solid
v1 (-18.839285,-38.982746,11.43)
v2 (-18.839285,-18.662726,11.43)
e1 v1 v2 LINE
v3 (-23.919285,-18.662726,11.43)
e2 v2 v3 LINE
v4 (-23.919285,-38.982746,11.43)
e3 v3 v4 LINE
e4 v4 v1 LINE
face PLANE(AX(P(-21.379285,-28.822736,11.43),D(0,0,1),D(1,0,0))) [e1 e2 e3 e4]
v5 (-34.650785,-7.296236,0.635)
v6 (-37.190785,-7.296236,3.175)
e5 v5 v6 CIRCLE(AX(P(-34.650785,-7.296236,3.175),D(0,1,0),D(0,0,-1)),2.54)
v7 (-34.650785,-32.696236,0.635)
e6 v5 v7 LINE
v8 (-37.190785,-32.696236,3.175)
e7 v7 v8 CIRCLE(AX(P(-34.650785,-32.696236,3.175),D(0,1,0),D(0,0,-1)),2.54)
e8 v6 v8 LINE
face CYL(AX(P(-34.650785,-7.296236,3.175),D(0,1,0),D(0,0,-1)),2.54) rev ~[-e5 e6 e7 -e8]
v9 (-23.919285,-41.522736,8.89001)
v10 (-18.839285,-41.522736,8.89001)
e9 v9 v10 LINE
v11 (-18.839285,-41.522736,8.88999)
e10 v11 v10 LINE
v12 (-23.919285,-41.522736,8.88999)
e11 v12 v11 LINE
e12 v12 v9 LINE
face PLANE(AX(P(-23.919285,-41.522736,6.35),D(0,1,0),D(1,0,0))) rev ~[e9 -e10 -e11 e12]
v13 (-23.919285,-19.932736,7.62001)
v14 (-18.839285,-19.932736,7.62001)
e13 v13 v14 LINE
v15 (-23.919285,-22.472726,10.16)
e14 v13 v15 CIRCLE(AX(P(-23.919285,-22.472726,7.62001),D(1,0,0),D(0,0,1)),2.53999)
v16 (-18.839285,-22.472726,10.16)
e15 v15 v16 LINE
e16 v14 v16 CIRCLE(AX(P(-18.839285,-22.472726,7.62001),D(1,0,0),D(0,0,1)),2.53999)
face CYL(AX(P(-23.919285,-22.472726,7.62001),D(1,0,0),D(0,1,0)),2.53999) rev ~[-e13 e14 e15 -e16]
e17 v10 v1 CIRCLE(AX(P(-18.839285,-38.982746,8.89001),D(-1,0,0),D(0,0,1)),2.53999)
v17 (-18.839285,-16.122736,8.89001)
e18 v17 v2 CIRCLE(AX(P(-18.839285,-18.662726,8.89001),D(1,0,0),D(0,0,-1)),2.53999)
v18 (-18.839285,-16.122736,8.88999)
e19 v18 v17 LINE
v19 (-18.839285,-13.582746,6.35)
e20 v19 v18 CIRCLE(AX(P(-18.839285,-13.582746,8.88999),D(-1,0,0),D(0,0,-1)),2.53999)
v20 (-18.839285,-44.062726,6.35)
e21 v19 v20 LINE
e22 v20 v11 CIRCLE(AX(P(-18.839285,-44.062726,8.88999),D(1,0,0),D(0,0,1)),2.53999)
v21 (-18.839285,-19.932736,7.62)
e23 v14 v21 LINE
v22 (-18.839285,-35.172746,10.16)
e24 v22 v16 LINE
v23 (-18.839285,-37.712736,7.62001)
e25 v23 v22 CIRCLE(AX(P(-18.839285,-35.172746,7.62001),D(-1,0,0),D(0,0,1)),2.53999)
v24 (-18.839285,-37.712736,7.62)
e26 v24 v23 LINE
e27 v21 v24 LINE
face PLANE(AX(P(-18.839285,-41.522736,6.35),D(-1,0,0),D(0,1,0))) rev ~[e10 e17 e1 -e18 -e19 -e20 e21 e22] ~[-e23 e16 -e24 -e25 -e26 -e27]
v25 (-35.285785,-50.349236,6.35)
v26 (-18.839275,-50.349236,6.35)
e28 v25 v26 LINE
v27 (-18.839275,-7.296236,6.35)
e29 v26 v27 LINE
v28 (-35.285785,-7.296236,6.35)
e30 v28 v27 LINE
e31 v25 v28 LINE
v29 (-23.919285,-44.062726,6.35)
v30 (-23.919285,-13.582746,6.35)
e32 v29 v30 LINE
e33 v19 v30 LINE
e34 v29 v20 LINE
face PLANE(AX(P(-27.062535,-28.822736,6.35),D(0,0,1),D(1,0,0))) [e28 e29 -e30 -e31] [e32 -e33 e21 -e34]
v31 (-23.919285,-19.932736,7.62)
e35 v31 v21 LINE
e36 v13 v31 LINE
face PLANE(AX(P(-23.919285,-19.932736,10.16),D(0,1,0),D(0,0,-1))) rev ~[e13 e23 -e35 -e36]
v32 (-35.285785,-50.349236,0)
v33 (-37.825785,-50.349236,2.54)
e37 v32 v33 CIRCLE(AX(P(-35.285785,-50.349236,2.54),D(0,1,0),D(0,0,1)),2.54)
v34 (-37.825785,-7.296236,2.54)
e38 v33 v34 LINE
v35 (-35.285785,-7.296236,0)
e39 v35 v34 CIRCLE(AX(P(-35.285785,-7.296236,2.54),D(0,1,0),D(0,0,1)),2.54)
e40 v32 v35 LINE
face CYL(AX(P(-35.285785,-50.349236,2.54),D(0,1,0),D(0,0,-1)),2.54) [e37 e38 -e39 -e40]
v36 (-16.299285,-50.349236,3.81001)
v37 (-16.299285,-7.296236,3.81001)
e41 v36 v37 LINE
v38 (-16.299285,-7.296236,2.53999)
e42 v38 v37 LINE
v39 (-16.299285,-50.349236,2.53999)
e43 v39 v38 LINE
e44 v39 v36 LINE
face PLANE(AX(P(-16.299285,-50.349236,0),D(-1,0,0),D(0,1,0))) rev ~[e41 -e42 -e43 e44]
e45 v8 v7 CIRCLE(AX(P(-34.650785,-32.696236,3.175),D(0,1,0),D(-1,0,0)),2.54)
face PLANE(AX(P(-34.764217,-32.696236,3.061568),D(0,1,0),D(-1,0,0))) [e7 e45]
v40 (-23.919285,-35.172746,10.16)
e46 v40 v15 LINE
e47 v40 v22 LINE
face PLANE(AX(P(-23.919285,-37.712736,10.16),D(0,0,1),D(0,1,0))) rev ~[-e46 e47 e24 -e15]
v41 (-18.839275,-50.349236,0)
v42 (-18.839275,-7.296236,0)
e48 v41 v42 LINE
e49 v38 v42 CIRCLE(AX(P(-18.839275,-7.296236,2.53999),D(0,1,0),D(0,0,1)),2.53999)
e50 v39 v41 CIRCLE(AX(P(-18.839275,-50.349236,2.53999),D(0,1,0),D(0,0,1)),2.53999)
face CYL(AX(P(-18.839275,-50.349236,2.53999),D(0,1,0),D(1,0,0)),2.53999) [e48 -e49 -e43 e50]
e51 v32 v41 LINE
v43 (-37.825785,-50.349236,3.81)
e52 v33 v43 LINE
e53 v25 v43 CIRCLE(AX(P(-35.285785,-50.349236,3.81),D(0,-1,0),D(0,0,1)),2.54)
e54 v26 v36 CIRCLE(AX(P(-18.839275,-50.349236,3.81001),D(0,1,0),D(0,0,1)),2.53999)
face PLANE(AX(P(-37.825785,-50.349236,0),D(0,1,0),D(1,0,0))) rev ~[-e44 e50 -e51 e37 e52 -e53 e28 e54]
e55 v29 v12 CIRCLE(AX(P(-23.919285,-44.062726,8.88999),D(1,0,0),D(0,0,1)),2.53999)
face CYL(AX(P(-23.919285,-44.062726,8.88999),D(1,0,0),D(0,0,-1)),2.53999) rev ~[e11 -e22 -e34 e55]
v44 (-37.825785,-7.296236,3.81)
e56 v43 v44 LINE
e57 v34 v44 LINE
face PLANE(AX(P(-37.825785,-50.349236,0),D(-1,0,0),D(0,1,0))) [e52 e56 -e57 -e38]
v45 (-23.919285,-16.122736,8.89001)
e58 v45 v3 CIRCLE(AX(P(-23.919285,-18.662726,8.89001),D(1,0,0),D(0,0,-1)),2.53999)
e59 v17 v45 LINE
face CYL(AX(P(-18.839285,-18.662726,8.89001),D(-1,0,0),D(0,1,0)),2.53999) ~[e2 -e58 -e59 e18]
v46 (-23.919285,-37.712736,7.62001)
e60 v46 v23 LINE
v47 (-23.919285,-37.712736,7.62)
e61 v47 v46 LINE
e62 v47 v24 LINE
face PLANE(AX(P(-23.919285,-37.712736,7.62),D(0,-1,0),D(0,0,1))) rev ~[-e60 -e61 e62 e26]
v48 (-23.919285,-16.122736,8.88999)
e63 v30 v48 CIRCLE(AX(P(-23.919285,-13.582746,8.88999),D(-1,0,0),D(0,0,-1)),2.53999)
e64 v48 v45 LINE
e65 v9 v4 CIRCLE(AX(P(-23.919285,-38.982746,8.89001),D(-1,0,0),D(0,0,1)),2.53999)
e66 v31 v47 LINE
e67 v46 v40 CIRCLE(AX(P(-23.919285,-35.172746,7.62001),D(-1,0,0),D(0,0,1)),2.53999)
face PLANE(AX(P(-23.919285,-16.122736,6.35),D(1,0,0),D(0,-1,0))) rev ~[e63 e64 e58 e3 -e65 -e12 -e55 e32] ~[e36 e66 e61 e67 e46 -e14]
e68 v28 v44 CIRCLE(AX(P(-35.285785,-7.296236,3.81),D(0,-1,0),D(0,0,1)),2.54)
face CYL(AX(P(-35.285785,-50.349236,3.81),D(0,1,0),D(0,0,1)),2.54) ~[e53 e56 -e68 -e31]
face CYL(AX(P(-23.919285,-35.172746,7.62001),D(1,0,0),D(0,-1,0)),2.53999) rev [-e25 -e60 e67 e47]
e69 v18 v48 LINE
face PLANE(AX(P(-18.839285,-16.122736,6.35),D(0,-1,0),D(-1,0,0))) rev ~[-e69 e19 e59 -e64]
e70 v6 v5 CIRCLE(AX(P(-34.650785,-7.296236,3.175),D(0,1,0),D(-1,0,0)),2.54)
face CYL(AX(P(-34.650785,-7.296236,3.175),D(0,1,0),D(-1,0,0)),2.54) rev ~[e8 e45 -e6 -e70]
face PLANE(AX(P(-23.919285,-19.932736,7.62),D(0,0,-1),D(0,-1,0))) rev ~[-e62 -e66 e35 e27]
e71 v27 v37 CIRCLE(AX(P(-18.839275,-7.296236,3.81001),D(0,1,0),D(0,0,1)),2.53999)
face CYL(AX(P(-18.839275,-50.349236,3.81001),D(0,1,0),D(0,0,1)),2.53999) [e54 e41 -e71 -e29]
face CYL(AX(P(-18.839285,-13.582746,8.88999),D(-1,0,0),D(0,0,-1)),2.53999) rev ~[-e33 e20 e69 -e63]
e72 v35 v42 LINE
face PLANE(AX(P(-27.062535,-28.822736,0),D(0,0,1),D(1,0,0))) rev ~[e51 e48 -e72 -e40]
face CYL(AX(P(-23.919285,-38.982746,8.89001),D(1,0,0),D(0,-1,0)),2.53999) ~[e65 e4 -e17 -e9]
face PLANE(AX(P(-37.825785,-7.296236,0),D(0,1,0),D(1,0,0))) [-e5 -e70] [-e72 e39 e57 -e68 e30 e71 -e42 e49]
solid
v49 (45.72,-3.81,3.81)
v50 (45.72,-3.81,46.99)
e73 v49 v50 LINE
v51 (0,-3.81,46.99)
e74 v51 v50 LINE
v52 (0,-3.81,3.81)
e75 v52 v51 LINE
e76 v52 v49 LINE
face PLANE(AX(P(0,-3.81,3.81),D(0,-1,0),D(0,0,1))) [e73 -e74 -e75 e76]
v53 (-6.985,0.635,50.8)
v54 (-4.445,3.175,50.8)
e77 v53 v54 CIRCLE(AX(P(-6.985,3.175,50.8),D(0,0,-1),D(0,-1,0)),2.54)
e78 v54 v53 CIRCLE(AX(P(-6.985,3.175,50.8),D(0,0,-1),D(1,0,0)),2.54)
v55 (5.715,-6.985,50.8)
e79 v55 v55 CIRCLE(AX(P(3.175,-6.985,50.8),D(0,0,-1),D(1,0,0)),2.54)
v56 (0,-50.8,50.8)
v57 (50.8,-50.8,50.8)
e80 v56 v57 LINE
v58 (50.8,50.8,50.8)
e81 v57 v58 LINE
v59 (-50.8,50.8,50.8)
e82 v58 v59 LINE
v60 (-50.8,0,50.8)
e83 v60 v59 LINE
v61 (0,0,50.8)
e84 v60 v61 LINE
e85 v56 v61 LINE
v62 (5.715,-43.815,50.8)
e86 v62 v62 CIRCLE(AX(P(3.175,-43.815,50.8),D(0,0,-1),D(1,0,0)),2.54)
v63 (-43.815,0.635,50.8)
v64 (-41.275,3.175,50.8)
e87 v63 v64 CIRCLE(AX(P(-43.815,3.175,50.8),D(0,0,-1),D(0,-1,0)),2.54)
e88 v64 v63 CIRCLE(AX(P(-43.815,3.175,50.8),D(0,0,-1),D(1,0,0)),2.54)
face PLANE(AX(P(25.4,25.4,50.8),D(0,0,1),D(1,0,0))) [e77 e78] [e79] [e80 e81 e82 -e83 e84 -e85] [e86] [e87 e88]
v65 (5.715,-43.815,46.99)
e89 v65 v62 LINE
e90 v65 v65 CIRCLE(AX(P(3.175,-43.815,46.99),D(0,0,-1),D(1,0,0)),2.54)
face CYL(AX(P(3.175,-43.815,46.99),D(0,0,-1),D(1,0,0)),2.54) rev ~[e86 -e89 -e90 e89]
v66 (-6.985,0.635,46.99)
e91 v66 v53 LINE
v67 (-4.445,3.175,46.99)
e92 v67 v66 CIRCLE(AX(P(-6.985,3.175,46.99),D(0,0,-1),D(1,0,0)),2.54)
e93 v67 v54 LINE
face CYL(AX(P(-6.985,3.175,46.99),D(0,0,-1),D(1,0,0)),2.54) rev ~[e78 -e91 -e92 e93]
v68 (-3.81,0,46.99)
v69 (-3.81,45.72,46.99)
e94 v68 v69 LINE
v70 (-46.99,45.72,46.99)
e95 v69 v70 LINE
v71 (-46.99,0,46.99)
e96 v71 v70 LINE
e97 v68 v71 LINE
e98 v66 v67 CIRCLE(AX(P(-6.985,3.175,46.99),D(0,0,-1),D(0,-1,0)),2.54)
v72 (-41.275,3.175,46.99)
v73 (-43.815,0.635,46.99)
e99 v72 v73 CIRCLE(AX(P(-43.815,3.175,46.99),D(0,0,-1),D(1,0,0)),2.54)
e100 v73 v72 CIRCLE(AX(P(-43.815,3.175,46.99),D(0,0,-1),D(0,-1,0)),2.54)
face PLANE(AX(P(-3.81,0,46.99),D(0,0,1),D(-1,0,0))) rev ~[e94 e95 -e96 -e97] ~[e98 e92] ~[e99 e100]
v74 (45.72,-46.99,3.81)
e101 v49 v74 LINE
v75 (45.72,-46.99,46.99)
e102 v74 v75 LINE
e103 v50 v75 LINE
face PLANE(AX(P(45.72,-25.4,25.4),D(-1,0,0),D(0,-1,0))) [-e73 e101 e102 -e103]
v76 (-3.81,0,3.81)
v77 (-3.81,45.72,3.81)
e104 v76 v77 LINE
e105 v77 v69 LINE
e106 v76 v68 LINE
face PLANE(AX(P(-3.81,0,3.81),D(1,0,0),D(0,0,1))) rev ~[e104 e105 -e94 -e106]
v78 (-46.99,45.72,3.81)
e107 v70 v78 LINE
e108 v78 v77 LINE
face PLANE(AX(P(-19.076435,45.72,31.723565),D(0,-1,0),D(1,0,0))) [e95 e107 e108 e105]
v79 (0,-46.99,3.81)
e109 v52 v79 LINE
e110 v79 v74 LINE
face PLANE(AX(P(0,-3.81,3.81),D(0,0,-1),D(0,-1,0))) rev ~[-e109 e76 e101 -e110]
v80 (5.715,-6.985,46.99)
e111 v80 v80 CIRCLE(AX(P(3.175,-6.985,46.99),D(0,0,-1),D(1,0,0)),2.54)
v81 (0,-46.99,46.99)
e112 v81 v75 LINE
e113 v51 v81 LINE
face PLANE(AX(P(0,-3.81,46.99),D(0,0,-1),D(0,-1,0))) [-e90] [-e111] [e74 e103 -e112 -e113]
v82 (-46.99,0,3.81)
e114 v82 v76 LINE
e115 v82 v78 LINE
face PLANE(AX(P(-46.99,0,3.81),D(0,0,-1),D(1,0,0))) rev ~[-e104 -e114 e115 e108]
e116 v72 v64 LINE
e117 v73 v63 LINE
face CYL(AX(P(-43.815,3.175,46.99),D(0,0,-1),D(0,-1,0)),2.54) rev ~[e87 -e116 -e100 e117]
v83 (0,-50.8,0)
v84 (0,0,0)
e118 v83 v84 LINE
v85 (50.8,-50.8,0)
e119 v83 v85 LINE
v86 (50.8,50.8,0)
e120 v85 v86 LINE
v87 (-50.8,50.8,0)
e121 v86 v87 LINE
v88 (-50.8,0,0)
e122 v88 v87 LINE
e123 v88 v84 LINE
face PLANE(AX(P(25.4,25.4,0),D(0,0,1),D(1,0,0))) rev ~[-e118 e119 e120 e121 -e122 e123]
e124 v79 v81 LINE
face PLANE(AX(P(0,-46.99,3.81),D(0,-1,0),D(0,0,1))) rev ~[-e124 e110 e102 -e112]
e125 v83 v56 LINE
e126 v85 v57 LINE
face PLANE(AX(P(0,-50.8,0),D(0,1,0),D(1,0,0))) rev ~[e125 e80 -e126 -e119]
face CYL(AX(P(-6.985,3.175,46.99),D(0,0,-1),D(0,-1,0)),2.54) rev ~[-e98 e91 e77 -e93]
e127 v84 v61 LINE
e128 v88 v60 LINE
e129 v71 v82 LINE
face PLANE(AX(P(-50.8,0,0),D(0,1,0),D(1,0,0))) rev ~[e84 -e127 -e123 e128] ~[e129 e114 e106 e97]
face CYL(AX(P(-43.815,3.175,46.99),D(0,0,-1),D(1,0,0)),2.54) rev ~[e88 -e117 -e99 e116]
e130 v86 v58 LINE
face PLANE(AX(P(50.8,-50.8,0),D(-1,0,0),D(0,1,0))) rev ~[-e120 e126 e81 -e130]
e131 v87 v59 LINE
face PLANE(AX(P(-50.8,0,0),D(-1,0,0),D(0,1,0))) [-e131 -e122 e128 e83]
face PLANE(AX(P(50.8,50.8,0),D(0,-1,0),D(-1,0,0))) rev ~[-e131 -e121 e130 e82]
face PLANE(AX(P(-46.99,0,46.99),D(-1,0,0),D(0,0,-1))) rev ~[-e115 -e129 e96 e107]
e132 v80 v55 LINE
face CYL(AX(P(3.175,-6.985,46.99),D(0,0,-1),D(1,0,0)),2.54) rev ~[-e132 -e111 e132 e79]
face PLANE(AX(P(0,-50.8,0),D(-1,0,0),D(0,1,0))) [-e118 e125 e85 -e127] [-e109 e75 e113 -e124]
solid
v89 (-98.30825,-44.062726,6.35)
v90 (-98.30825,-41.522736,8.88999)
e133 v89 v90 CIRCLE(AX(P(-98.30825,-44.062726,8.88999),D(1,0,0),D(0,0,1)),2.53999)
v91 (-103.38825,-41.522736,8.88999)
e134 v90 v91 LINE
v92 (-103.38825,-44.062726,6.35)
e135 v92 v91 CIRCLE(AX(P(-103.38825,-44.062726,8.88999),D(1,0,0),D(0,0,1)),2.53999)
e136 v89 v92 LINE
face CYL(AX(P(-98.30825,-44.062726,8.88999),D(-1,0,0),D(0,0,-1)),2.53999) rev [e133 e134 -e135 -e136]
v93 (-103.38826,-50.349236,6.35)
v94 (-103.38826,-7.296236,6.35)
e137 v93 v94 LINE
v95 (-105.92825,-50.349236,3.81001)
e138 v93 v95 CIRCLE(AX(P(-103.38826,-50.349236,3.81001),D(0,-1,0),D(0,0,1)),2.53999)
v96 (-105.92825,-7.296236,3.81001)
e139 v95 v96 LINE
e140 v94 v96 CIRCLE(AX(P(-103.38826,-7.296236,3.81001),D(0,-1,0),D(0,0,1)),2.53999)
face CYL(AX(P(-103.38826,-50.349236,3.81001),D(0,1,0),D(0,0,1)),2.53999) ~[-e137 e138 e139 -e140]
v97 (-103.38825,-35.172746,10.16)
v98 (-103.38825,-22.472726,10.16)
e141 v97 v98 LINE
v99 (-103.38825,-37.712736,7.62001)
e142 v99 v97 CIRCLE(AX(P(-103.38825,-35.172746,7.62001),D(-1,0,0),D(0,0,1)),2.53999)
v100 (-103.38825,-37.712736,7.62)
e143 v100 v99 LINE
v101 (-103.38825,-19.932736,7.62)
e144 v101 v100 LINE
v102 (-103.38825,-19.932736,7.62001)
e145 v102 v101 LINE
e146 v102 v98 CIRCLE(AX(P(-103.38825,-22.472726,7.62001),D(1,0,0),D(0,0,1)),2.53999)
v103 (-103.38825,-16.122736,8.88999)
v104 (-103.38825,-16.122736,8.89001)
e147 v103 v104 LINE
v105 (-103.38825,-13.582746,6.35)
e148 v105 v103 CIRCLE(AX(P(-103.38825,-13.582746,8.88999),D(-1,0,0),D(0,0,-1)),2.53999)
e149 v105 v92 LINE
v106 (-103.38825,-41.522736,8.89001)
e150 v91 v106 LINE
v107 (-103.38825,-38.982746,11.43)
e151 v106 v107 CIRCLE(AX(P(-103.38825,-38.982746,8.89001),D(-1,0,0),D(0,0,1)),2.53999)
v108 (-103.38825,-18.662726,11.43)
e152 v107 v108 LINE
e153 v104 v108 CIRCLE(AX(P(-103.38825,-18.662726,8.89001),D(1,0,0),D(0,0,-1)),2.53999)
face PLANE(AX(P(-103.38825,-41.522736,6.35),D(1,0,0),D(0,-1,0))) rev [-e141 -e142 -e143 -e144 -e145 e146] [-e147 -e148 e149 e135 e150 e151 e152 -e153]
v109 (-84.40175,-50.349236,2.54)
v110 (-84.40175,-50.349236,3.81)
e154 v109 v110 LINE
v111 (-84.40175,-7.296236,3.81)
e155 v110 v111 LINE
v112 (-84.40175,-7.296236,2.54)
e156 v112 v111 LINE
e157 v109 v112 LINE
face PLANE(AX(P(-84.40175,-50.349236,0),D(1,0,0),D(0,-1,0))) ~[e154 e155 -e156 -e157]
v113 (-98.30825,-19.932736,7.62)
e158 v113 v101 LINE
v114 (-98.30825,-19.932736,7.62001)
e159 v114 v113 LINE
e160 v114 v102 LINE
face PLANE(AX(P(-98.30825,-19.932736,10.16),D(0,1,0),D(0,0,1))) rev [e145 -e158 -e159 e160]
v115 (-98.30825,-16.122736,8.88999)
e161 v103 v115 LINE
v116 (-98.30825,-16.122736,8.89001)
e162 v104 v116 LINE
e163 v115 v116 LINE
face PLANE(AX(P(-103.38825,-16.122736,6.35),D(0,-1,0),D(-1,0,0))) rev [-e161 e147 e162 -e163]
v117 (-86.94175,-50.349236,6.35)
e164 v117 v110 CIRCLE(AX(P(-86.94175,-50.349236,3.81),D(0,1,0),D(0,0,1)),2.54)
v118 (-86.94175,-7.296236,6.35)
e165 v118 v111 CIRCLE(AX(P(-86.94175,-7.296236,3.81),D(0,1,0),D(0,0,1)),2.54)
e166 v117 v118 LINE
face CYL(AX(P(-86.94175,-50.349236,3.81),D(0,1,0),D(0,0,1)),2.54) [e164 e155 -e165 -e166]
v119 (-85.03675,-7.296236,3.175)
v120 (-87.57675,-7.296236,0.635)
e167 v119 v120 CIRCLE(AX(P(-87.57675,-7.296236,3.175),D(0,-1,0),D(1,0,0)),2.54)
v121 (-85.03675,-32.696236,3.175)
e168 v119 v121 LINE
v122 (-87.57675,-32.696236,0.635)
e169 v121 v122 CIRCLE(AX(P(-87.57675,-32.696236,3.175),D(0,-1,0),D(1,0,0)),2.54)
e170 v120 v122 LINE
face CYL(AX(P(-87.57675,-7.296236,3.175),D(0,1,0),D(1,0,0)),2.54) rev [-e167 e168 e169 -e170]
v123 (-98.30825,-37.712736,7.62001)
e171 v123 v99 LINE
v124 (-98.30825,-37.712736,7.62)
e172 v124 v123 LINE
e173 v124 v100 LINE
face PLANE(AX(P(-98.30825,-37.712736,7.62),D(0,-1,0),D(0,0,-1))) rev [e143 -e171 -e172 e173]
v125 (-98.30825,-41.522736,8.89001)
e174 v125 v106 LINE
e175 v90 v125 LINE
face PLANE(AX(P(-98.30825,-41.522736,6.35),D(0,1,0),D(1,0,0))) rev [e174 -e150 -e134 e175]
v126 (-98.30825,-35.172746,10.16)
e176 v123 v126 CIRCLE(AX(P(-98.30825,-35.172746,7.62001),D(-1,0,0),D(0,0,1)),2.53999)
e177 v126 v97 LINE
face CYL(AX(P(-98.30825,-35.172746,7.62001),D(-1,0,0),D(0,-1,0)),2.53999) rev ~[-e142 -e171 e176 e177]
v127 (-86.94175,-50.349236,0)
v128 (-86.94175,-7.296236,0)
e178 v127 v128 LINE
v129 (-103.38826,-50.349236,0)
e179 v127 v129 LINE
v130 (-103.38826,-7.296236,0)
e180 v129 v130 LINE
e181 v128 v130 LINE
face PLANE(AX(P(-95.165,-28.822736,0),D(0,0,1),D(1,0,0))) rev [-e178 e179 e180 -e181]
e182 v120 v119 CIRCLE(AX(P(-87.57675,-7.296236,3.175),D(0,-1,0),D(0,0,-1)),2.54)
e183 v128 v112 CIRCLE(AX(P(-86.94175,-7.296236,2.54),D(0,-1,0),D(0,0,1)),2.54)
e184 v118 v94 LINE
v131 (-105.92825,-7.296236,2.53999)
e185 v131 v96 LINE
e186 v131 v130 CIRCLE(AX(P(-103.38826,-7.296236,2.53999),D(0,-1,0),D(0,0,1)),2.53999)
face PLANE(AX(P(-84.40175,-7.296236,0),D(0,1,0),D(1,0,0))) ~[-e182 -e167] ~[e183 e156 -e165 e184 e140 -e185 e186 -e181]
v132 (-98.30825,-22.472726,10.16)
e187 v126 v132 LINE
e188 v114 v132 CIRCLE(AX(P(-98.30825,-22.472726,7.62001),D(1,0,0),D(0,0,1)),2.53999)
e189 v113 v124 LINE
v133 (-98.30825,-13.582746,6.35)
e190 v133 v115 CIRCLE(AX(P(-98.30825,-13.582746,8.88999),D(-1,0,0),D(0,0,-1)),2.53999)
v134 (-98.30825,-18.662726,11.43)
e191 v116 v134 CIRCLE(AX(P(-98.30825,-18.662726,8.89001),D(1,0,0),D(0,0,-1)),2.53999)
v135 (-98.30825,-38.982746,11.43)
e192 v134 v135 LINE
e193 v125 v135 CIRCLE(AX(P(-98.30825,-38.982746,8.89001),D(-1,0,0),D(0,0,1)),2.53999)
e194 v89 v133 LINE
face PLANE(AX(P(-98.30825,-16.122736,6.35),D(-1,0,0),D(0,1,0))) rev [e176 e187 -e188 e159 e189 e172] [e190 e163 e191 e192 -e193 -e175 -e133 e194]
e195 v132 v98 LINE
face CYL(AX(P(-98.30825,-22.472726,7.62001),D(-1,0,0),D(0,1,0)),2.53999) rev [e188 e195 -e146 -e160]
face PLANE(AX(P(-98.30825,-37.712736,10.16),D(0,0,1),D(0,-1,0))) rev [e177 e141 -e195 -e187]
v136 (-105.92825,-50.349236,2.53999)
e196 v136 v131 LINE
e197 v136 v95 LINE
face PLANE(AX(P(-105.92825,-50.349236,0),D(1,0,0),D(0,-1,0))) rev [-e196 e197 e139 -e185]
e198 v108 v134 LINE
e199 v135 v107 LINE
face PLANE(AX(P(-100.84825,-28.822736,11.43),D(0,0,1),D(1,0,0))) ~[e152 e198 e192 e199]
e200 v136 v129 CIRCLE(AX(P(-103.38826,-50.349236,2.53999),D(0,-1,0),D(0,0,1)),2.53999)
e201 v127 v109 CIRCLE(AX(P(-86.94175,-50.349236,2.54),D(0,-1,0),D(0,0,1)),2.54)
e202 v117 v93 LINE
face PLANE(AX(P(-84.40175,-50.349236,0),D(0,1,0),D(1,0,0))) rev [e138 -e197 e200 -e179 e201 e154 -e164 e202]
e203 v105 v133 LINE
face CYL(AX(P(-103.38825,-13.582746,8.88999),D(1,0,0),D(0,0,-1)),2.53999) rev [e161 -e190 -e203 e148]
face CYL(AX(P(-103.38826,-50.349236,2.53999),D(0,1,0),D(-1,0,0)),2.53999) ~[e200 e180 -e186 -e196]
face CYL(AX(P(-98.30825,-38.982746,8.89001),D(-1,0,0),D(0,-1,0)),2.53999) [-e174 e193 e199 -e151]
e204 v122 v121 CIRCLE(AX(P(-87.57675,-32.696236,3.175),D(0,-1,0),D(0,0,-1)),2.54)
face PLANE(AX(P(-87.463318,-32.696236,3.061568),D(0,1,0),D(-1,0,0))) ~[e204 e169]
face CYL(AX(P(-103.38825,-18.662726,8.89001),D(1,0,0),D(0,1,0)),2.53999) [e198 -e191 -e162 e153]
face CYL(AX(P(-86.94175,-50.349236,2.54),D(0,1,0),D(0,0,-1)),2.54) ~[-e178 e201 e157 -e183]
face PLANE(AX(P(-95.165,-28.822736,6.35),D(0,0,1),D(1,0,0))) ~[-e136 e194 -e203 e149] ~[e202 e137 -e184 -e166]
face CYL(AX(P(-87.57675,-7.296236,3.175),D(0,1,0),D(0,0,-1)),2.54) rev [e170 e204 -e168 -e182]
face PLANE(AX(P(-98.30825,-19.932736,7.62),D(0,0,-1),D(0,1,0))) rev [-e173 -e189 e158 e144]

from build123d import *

# Parameters (mm, degrees)
F0_W      = 50.8
F0_H      = 50.8
F1_DEPTH  = 50.8
F4_DEPTH  = 45.72
F6_DEPTH  = 25.4
F2_W      = 43.18
F2_H      = 43.18
F7_DEPTH  = 45.72
F8_R      = 2.54
F9_DEPTH  = 25.4
F10_W     = 21.5265
F10_H     = 43.053
F11_DEPTH = 6.35
F13_DEPTH = 25.4
F15_DEPTH = 5.08
F17_DEPTH = 25.4
F18_R     = 2.53999
F19_W     = 5.3519308567
F19_H     = 34.44376681
F20_DEPTH = 25.4
F22_DEPTH = 25.4
F23_R     = 2.54
F23_2_R   = 2.54
F24_R     = 2.53999
F24_2_R   = 2.53999


# Not quite as in the source:
# - a fillet or chamfer is up to 0.001 mm smaller than in the source, because OpenCascade refuses the exact size


with BuildPart() as f1:
    # F0 (on Top) → F1 (new body)
    with BuildSketch(Plane.XY):
        with Locations((25.4, 25.4)):
            Rectangle(F0_W, F0_H)
        with Locations((-25.4, 25.4)):
            Rectangle(F0_W, F0_H)
        with Locations((25.4, -25.4)):
            Rectangle(F0_W, F0_H)
    extrude(amount=F1_DEPTH)

    # F3 (on face) → F4 (cut)
    with BuildSketch(Plane.XZ):
        Polygon((-3.81, 46.99), (-46.99, 46.99), (-3.81, 3.81), align=None)
        Polygon((-3.81, 3.81), (-46.99, 46.99), (-46.99, 3.81), align=None)
    extrude(amount=-F4_DEPTH, mode=Mode.SUBTRACT)

    # F5 (on face) → F6 (cut)
    with BuildSketch(Plane(origin=(0, 0, 46.99), x_dir=(1, 0, 0), z_dir=(0, 0, -1))):
        with BuildLine():
            ThreePointArc((-41.275, -3.175), (-42.0189487758, -1.3789487758), (-43.815, -0.635))
            ThreePointArc((-43.815, -0.635), (-45.6110512242, -4.9710512242), (-41.275, -3.175))
        make_face()
        with BuildLine():
            ThreePointArc((-4.445, -3.175), (-5.1889487758, -1.3789487758), (-6.985, -0.635))
            ThreePointArc((-6.985, -0.635), (-8.7810512242, -4.9710512242), (-4.445, -3.175))
        make_face()
    extrude(amount=-F6_DEPTH, mode=Mode.SUBTRACT)

    # F2 (on face) → F7 (cut)
    with BuildSketch(Plane(origin=(0, 0, 0), x_dir=(0, -1, 0), z_dir=(-1, 0, 0))):
        with Locations((25.4, 25.4)):
            Rectangle(F2_W, F2_H)
    extrude(amount=-F7_DEPTH, mode=Mode.SUBTRACT)

    # F8 (on face) → F9 (cut)
    with BuildSketch(Plane(origin=(0, 0, 46.99), x_dir=(1, 0, 0), z_dir=(0, 0, -1))):
        with BuildLine():
            ThreePointArc((0.635, 6.985), (3.175, 4.445), (5.715, 6.985))
            ThreePointArc((5.715, 6.985), (3.175, 9.525), (0.635, 6.985))
        make_face()
        with Locations((3.175, 43.815)):
            Circle(F8_R)
    extrude(amount=-F9_DEPTH, mode=Mode.SUBTRACT)


with BuildPart() as f11:
    # F10 (on Top) → F11 (new body)
    with BuildSketch(Plane.XY):
        with Locations((-27.0625350275, -28.8227358833)):
            Rectangle(F10_W, F10_H)
    extrude(amount=F11_DEPTH)

    # F12 (on face) → F13 (cut)
    with BuildSketch(Plane(origin=(0, -7.2962358833, 0), x_dir=(-1, 0, 0), z_dir=(0, 1, 0))):
        with BuildLine():
            ThreePointArc((34.6507850275, 0.635), (36.4468362517, 1.3789487758), (37.1907850275, 3.175))
            ThreePointArc((37.1907850275, 3.175), (32.8547338033, 4.9710512242), (34.6507850275, 0.635))
        make_face()
    extrude(amount=-F13_DEPTH, mode=Mode.SUBTRACT)

    # F14 (on face) → F15 (join)
    with BuildSketch(Plane.XY.offset(6.35)):
        Polygon((-18.8392850275, -28.8227358833), (-18.8392850275, -16.1227358833), (-23.9192850275, -16.1227358833), (-23.9192850275, -41.5227358833), (-18.8392850275, -41.5227358833), align=None)
    extrude(amount=F15_DEPTH)

    # F16 (on face) → F17 (cut)
    with BuildSketch(Plane(origin=(-23.9192850275, 0, 0), x_dir=(0, -1, 0), z_dir=(-1, 0, 0))):
        Polygon((37.7127358833, 10.16), (22.4727358833, 10.16), (35.1727358833, 7.62), (37.7127358833, 7.62), align=None)
        Polygon((35.1727358833, 7.62), (22.4727358833, 10.16), (19.9327358833, 10.16), (19.9327358833, 7.62), align=None)
    extrude(amount=-F17_DEPTH, mode=Mode.SUBTRACT)

    # F18 (radius 2.54 in the source; OpenCascade refuses exactly that, so slightly less here)
    f18_edges = [f11.edges().sort_by_distance(p)[0] for p in [
        (-21.379285, -41.522736, 6.35),
        (-21.379285, -41.522736, 11.43),
        (-21.379285, -16.122736, 11.43),
        (-21.379285, -16.122736, 6.35),
        (-21.379285, -19.932736, 10.16),
        (-21.379285, -37.712736, 10.16),
    ]]
    fillet(f18_edges, radius=F18_R)


with BuildPart() as f20:
    # F19 (on Top) → F20 (new body)
    with BuildSketch(Plane.XY):
        with Locations((-63.7897327542, -23.4408969991)):
            Rectangle(F19_W, F19_H)
    extrude(amount=F20_DEPTH)

    # F22 (cut): a face of the model
    f22_faces = [f20.faces().sort_by_distance(p)[0] for p in [
        (-63.7897327542, -23.4408969991, 25.4),
    ]]
    extrude(f22_faces, amount=-F22_DEPTH, mode=Mode.SUBTRACT)


with BuildPart() as f21_1:
    # F21: instance of F11
    add(f11.part.mirror(Plane(origin=(-61.1137673259, -23.4408969991, 12.7), x_dir=(0, 1, 0), z_dir=(1, 0, 0))))

    # F23
    f23_edges = [f21_1.edges().sort_by_distance(p)[0] for p in [
        (-84.40175, -28.822736, 6.35),
        (-84.40175, -28.822736, 0),
    ]]
    fillet(f23_edges, radius=F23_R)

    # F24#2 (radius 2.54 in the source; OpenCascade refuses exactly that, so slightly less here)
    f24_2_edges = [f21_1.edges().sort_by_distance(p)[0] for p in [
        (-105.92825, -28.822736, 6.35),
        (-105.92825, -28.822736, 0),
    ]]
    fillet(f24_2_edges, radius=F24_2_R)


with BuildPart() as f11_1:
    add(f11.part)

    # F23#2
    f23_2_edges = [f11_1.edges().sort_by_distance(p)[0] for p in [
        (-37.825785, -28.822736, 0),
        (-37.825785, -28.822736, 6.35),
    ]]
    fillet(f23_2_edges, radius=F23_2_R)

    # F24 (radius 2.54 in the source; OpenCascade refuses exactly that, so slightly less here)
    f24_edges = [f11_1.edges().sort_by_distance(p)[0] for p in [
        (-16.299285, -28.822736, 0),
        (-16.299285, -28.822736, 6.35),
    ]]
    fillet(f24_edges, radius=F24_R)


solid = Compound([f1.part, f21_1.part, f11_1.part])
